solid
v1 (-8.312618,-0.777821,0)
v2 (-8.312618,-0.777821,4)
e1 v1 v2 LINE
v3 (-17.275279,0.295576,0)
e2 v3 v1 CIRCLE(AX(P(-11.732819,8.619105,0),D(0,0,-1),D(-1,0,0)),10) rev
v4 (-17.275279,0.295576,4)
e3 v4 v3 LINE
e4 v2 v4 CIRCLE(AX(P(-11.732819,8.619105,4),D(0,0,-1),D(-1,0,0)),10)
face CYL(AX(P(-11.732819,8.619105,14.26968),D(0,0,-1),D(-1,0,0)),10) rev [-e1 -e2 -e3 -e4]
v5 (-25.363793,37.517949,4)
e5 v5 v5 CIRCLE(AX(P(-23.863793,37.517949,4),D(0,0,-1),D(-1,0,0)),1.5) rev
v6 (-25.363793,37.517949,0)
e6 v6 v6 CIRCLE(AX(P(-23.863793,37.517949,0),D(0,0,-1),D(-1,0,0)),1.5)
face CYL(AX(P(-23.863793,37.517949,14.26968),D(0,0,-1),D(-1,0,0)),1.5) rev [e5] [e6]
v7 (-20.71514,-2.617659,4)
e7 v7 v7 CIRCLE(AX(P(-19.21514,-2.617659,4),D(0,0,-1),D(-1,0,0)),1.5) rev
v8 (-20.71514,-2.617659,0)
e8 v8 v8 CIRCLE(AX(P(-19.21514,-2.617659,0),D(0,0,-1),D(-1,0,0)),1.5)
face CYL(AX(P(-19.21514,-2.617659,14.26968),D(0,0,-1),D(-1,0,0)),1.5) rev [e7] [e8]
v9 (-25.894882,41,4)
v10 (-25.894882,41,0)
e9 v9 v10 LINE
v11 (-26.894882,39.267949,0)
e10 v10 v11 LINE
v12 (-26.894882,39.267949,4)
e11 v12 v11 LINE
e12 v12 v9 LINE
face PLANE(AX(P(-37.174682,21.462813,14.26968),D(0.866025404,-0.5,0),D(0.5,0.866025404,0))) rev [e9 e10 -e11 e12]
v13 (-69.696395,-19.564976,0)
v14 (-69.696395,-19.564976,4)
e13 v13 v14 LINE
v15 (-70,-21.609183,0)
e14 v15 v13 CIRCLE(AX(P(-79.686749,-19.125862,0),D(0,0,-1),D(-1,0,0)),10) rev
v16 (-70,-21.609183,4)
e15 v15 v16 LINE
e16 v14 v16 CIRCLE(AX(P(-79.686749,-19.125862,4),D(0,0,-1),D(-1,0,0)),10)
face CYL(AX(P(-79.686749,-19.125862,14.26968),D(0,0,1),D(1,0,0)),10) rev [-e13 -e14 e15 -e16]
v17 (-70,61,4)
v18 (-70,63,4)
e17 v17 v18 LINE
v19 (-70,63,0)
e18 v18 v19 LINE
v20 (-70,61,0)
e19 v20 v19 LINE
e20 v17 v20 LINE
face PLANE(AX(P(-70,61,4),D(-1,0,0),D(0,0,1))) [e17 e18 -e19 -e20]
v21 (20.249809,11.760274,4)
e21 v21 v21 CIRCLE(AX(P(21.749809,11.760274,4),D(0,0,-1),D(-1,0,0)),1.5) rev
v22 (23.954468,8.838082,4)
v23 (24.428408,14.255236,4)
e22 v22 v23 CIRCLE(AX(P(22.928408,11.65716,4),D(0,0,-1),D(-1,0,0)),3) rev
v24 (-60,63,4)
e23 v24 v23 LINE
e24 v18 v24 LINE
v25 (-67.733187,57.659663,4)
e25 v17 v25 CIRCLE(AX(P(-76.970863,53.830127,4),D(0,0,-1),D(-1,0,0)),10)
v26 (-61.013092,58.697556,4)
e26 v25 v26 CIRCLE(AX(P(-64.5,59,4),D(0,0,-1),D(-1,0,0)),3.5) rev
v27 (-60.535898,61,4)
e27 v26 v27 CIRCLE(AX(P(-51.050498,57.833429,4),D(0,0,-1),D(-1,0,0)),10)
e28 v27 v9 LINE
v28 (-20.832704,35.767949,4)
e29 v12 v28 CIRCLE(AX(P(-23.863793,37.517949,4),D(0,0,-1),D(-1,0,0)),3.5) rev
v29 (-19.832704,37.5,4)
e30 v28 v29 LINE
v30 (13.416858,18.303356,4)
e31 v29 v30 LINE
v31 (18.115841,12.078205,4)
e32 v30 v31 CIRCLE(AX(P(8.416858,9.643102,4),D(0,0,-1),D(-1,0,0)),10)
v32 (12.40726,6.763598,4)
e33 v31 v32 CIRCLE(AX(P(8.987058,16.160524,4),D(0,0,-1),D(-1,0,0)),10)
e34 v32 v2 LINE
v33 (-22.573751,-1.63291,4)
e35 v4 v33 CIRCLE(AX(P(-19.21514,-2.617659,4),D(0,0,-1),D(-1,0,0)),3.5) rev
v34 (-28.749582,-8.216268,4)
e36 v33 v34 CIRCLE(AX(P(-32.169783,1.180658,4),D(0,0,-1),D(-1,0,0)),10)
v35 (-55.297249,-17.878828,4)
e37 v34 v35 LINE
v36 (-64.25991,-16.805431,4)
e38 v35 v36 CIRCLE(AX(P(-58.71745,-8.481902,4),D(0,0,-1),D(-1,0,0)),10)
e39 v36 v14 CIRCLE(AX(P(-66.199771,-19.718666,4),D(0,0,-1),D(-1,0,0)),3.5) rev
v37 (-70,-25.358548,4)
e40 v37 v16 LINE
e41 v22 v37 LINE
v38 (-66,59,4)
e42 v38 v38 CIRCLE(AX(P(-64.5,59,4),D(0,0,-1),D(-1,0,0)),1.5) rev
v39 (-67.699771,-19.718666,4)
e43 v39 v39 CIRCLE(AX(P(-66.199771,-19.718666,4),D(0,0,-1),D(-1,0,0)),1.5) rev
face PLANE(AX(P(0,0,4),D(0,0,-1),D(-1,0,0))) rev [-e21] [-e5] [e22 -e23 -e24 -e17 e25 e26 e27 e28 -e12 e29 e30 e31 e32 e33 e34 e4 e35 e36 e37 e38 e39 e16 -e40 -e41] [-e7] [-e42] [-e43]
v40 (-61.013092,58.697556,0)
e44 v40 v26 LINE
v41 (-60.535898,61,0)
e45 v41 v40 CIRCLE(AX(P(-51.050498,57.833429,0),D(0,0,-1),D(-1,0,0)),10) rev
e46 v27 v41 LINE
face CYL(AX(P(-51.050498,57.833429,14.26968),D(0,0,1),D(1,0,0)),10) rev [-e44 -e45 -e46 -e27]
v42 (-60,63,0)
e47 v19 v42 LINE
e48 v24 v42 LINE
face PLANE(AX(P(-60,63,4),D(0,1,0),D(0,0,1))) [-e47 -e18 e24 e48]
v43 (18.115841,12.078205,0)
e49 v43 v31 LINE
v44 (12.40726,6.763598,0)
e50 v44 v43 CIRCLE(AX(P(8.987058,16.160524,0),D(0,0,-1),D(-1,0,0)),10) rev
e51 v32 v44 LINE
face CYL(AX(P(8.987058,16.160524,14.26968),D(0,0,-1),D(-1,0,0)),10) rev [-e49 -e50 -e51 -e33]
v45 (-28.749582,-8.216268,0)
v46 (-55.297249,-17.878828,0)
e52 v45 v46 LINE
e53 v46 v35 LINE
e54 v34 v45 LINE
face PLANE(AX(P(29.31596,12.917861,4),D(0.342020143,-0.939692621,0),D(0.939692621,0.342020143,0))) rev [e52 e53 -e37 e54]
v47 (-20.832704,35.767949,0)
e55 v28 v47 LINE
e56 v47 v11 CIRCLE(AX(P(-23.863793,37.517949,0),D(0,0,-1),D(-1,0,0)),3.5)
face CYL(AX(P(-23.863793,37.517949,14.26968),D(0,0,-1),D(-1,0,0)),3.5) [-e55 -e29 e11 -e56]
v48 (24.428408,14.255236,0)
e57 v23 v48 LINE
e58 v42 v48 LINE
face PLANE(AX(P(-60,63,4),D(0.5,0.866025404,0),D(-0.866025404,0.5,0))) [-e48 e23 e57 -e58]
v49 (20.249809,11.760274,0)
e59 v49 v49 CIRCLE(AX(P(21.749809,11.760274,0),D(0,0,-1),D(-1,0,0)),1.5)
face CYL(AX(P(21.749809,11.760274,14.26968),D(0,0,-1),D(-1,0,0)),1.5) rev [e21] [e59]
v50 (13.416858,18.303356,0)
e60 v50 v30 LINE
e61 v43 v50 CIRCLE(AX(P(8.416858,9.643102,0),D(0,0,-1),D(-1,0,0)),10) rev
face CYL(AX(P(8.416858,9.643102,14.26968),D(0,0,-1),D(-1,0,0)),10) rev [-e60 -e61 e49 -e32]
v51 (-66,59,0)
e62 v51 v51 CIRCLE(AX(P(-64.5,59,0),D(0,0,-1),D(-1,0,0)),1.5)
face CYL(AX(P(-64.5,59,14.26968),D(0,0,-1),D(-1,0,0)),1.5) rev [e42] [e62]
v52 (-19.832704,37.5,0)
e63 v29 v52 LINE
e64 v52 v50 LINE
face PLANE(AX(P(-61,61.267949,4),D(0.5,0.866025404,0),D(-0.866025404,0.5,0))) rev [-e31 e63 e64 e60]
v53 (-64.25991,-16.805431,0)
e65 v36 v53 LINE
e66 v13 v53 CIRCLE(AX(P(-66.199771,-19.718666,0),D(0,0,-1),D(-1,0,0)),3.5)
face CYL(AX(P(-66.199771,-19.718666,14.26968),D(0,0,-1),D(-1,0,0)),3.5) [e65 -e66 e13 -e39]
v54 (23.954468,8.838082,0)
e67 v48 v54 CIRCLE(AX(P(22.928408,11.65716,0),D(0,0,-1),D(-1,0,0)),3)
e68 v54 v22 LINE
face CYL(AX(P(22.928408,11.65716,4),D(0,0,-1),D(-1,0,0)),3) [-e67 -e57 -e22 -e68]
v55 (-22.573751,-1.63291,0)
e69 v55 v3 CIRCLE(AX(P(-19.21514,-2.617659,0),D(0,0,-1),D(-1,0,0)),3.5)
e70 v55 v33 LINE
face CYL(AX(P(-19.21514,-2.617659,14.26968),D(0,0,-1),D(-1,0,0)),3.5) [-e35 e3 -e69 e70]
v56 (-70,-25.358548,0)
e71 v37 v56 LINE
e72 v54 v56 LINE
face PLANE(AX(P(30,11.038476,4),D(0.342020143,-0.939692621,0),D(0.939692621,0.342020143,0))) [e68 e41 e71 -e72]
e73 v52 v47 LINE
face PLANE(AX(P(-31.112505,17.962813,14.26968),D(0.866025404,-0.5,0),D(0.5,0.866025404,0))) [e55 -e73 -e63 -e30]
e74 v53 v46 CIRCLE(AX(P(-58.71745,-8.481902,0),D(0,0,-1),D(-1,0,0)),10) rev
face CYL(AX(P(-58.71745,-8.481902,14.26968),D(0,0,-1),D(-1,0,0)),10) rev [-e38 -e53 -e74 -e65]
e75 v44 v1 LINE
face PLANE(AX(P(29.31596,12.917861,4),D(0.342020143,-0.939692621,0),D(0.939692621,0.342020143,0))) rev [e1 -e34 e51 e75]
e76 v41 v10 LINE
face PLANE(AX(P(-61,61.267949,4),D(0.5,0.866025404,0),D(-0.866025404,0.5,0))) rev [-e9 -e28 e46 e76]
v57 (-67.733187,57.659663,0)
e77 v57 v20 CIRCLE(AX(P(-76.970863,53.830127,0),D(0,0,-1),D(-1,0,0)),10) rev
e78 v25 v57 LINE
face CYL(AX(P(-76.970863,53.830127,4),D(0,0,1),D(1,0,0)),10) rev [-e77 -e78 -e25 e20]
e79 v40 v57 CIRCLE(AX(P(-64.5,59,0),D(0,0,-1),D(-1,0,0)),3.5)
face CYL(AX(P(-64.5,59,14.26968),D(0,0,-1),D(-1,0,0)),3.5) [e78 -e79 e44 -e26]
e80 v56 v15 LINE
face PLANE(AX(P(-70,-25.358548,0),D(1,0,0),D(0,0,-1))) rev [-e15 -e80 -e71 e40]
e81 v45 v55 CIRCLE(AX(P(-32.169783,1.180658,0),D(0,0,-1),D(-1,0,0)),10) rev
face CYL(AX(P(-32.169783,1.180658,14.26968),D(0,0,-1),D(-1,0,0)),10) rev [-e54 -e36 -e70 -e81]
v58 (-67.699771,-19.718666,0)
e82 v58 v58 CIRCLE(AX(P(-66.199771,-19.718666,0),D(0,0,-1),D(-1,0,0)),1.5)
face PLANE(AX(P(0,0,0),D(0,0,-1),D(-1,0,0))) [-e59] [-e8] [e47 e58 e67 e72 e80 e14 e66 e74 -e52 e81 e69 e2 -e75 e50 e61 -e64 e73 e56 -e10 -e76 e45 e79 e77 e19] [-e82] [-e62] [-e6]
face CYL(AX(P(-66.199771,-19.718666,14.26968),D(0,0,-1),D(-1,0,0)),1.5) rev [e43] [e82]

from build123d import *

# Parameters (mm, degrees)
EXTRUDE_THIN1_DEPTH = 4
SKETCH2_R           = 1.5
BOSS_EXTRUDE1_DEPTH = 4
FILLET1_DEPTH       = 4
FILLET1_2_DEPTH     = 4
SKETCH3_W           = 3.133113898
SKETCH3_H           = 7.459824135
CUT_EXTRUDE1_DEPTH  = 95.769370322


with BuildPart() as part:
    # Sketch1 → Extrude-Thin1 (new body)
    with BuildSketch(Plane.XY):
        Polygon((-70, -25.358547654), (30, 11.038475773), (-60, 63), (-70, 63), (-70, 61), (-60.535898385, 61), (25.285605056, 11.450931886), (-70.684040287, -23.479162412), align=None)
    extrude(amount=EXTRUDE_THIN1_DEPTH)

    # Sketch2 → Boss-Extrude1 (add)
    # profile 1 of 17: a face of its own
    with BuildSketch(Plane(origin=(0, 0, 0), x_dir=(-1, 0, 0), z_dir=(0, 0, -1))):
        with BuildLine():
            ThreePointArc((69.699771159, -19.718666382), (66.807539781, -16.271839247), (62.910846986, -18.521595881))
            ThreePointArc((62.910846986, -18.521595881), (62.703305352, -19.561418618), (62.816669308, -20.615673554))
            Line((62.816669308, -20.615673554), (68.214792437, -22.580429694))
            ThreePointArc((68.214792437, -22.580429694), (68.979296275, -21.845692505), (69.488695332, -20.915736884))
            ThreePointArc((69.488695332, -20.915736884), (69.646598295, -20.326435004), (69.699771159, -19.718666382))
        make_face()
        with Locations((66.199771159, -19.718666382)):
            Circle(SKETCH2_R, mode=Mode.SUBTRACT)
    # profile 2 of 17: a face of its own
    with BuildSketch(Plane(origin=(0, 0, 0), x_dir=(-1, 0, 0), z_dir=(0, 0, -1))):
        with BuildLine():
            ThreePointArc((69.488695332, -20.915736884), (68.979296275, -21.845692505), (68.214792437, -22.580429694))
            Line((68.214792437, -22.580429694), (68.804655045, -22.795122125))
            Line((68.804655045, -22.795122125), (69.488695332, -20.915736884))
        make_face()
    # profile 3 of 17: a face of its own
    with BuildSketch(Plane(origin=(0, 0, 0), x_dir=(-1, 0, 0), z_dir=(0, 0, -1))):
        with BuildLine():
            Line((62.910846986, -18.521595881), (62.2268067, -20.400981122))
            Line((62.2268067, -20.400981122), (62.816669308, -20.615673554))
            ThreePointArc((62.816669308, -20.615673554), (62.703305352, -19.561418618), (62.910846986, -18.521595881))
        make_face()
    # profile 4 of 17: a face of its own
    with BuildSketch(Plane(origin=(0, 0, 0), x_dir=(-1, 0, 0), z_dir=(0, 0, -1))):
        with BuildLine():
            ThreePointArc((22.71514012, -2.617659216), (19.822908742, 0.82916792), (15.926215947, -1.420588714))
            ThreePointArc((15.926215947, -1.420588714), (15.718674313, -2.460411452), (15.832038269, -3.514666388))
            Line((15.832038269, -3.514666388), (21.230161397, -5.479422527))
            ThreePointArc((21.230161397, -5.479422527), (21.994665236, -4.744685339), (22.504064292, -3.814729718))
            ThreePointArc((22.504064292, -3.814729718), (22.661967255, -3.225427838), (22.71514012, -2.617659216))
        make_face()
        with Locations((19.21514012, -2.617659216)):
            Circle(SKETCH2_R, mode=Mode.SUBTRACT)
    # profile 5 of 17: a face of its own
    with BuildSketch(Plane(origin=(0, 0, 0), x_dir=(-1, 0, 0), z_dir=(0, 0, -1))):
        with BuildLine():
            ThreePointArc((22.504064292, -3.814729718), (21.994665236, -4.744685339), (21.230161397, -5.479422527))
            Line((21.230161397, -5.479422527), (21.820024006, -5.694114959))
            Line((21.820024006, -5.694114959), (22.504064292, -3.814729718))
        make_face()
    # profile 6 of 17: a face of its own
    with BuildSketch(Plane(origin=(0, 0, 0), x_dir=(-1, 0, 0), z_dir=(0, 0, -1))):
        with BuildLine():
            Line((15.926215947, -1.420588714), (15.24217566, -3.299973956))
            Line((15.24217566, -3.299973956), (15.832038269, -3.514666388))
            ThreePointArc((15.832038269, -3.514666388), (15.718674313, -2.460411452), (15.926215947, -1.420588714))
        make_face()
    # profile 7 of 17: a face of its own
    with BuildSketch(Plane(origin=(0, 0, 0), x_dir=(-1, 0, 0), z_dir=(0, 0, -1))):
        with BuildLine():
            ThreePointArc((-18.249808849, 11.760273971), (-18.650603728, 13.386597315), (-19.761196061, 14.640450906))
            Line((-19.761196061, 14.640450906), (-22.499808851, 13.059312075))
            ThreePointArc((-22.499808851, 13.059312075), (-20.99980885, 13.059312077), (-20.249808849, 11.760273971))
            ThreePointArc((-20.249808849, 11.760273971), (-20.889444174, 10.531545919), (-22.262839017, 10.350735022))
            Line((-22.262839017, 10.350735022), (-19.291270082, 9.269172381))
            ThreePointArc((-19.291270082, 9.269172381), (-18.520653721, 10.410252801), (-18.249808849, 11.760273971))
        make_face()
    # profile 8 of 17: a face of its own
    with BuildSketch(Plane(origin=(0, 0, 0), x_dir=(-1, 0, 0), z_dir=(0, 0, -1))):
        with BuildLine():
            Line((-22.499808851, 13.059312075), (-25.238421636, 11.478173246))
            ThreePointArc((-25.238421636, 11.478173246), (-25.236490292, 11.455228871), (-25.234408046, 11.432297698))
            Line((-25.234408046, 11.432297698), (-22.262839017, 10.350735022))
            ThreePointArc((-22.262839017, 10.350735022), (-23.244100894, 11.62954033), (-22.499808851, 13.059312075))
        make_face()
    # profile 9 of 17: a face of its own
    with BuildSketch(Plane(origin=(0, 0, 0), x_dir=(-1, 0, 0), z_dir=(0, 0, -1))):
        with BuildLine():
            ThreePointArc((-18.249808849, 11.760273971), (-18.650603728, 13.386597315), (-19.761196061, 14.640450906))
            Line((-19.761196061, 14.640450906), (-22.499808851, 13.059312075))
            ThreePointArc((-22.499808851, 13.059312075), (-20.99980885, 13.059312077), (-20.249808849, 11.760273971))
            ThreePointArc((-20.249808849, 11.760273971), (-20.889444174, 10.531545919), (-22.262839017, 10.350735022))
            Line((-22.262839017, 10.350735022), (-19.291270082, 9.269172381))
            ThreePointArc((-19.291270082, 9.269172381), (-18.520653721, 10.410252801), (-18.249808849, 11.760273971))
        make_face()
    # profile 10 of 17: a face of its own
    with BuildSketch(Plane(origin=(0, 0, 0), x_dir=(-1, 0, 0), z_dir=(0, 0, -1))):
        with BuildLine():
            Line((-22.499808851, 13.059312075), (-25.238421636, 11.478173246))
            ThreePointArc((-25.238421636, 11.478173246), (-25.236490292, 11.455228871), (-25.234408046, 11.432297698))
            Line((-25.234408046, 11.432297698), (-22.262839017, 10.350735022))
            ThreePointArc((-22.262839017, 10.350735022), (-23.244100894, 11.62954033), (-22.499808851, 13.059312075))
        make_face()
    # profile 11 of 17: a face of its own
    with BuildSketch(Plane(origin=(0, 0, 0), x_dir=(-1, 0, 0), z_dir=(0, 0, -1))):
        with BuildLine():
            ThreePointArc((-25.234408046, 11.432297698), (-25.236490292, 11.455228871), (-25.238421636, 11.478173246))
            Line((-25.238421636, 11.478173246), (-25.285605056, 11.450931886))
            Line((-25.285605056, 11.450931886), (-25.234408046, 11.432297698))
        make_face()
    # profile 12 of 17: a face of its own
    with BuildSketch(Plane(origin=(0, 0, 0), x_dir=(-1, 0, 0), z_dir=(0, 0, -1))):
        with BuildLine():
            ThreePointArc((27.36379332, 37.517949192), (27.244533712, 38.42381585), (26.894882233, 39.267949192))
            ThreePointArc((26.894882233, 39.267949192), (26.231736995, 40.09532048), (25.351261913, 40.686140662))
            Line((25.351261913, 40.686140662), (20.376324727, 37.813859338))
            ThreePointArc((20.376324727, 37.813859338), (20.447752473, 36.75593546), (20.832704407, 35.767949192))
            ThreePointArc((20.832704407, 35.767949192), (24.769659978, 34.1372088), (27.36379332, 37.517949192))
        make_face()
        with Locations((23.86379332, 37.517949192)):
            Circle(SKETCH2_R, mode=Mode.SUBTRACT)
    # profile 13 of 17: a face of its own
    with BuildSketch(Plane(origin=(0, 0, 0), x_dir=(-1, 0, 0), z_dir=(0, 0, -1))):
        with BuildLine():
            Line((26.894882233, 39.267949192), (25.894882233, 41))
            Line((25.894882233, 41), (25.351261913, 40.686140662))
            ThreePointArc((25.351261913, 40.686140662), (26.231736995, 40.09532048), (26.894882233, 39.267949192))
        make_face()
    # profile 14 of 17: a face of its own
    with BuildSketch(Plane(origin=(0, 0, 0), x_dir=(-1, 0, 0), z_dir=(0, 0, -1))):
        with BuildLine():
            ThreePointArc((20.832704407, 35.767949192), (20.447752473, 36.75593546), (20.376324727, 37.813859338))
            Line((20.376324727, 37.813859338), (19.832704407, 37.5))
            Line((19.832704407, 37.5), (20.832704407, 35.767949192))
        make_face()
    # profile 15 of 17: a face of its own
    with BuildSketch(Plane(origin=(0, 0, 0), x_dir=(-1, 0, 0), z_dir=(0, 0, -1))):
        with BuildLine():
            ThreePointArc((61, 59), (64.5, 55.5), (68, 59))
            ThreePointArc((68, 59), (67.839385021, 60.048097173), (67.372281323, 61))
            Line((67.372281323, 61), (61.627718677, 61))
            ThreePointArc((61.627718677, 61), (61.160614979, 60.048097173), (61, 59))
        make_face()
        with Locations((64.5, 59)):
            Circle(SKETCH2_R, mode=Mode.SUBTRACT)
    # profile 16 of 17: a face of its own
    with BuildSketch(Plane(origin=(0, 0, 0), x_dir=(-1, 0, 0), z_dir=(0, 0, -1))):
        with BuildLine():
            Line((61, 61), (61, 59))
            ThreePointArc((61, 59), (61.160614979, 60.048097173), (61.627718677, 61))
            Line((61.627718677, 61), (61, 61))
        make_face()
    # profile 17 of 17: a face of its own
    with BuildSketch(Plane(origin=(0, 0, 0), x_dir=(-1, 0, 0), z_dir=(0, 0, -1))):
        with BuildLine():
            ThreePointArc((67.372281323, 61), (67.839385021, 60.048097173), (68, 59))
            Line((68, 59), (68, 61))
            Line((68, 61), (67.372281323, 61))
        make_face()
    extrude(amount=-BOSS_EXTRUDE1_DEPTH)

    # Fillet1: read off the stored shape, not the designer's step
    # Fillet1 outline → Fillet1 (cut)
    with BuildSketch(Plane.XY):
        with BuildLine():
            Line((30, 11.038475773), (24.428407585, 14.255236154))
            ThreePointArc((24.428407585, 14.255236154), (25.916991679, 11.395692714), (23.954468015, 8.83808208))
            Line((23.954468015, 8.83808208), (30, 11.038475773))
        make_face()
    extrude(amount=FILLET1_DEPTH, mode=Mode.SUBTRACT)

    # Fillet1 2 outline → Fillet1 2 (add)
    with BuildSketch(Plane.XY):
        with BuildLine():
            ThreePointArc((13.416857787, 18.303356317), (16.398283352, 15.667788657), (18.115840977, 12.078204963))
            ThreePointArc((18.115840977, 12.078204963), (15.801052244, 8.841405863), (12.407259711, 6.763597514))
            Line((12.407259711, 6.763597514), (19.291270082, 9.269172381))
            ThreePointArc((19.291270082, 9.269172381), (18.263127406, 12.06531907), (19.761196061, 14.640450906))
            Line((19.761196061, 14.640450906), (13.416857787, 18.303356317))
        make_face()
        with BuildLine():
            ThreePointArc((-69.488695332, -20.915736884), (-69.65911424, -20.25059255), (-69.696395151, -19.564976241))
            ThreePointArc((-69.696395151, -19.564976241), (-69.990650839, -21.572424943), (-70.684040287, -23.479162412))
            Line((-70.684040287, -23.479162412), (-68.804655045, -22.795122125))
            Line((-68.804655045, -22.795122125), (-69.488695332, -20.915736884))
        make_face()
        with BuildLine():
            Line((-62.2268067, -20.400981122), (-55.29724871, -17.878828277))
            ThreePointArc((-55.29724871, -17.878828277), (-59.906584574, -18.410948313), (-64.259910155, -16.80543119))
            ThreePointArc((-64.259910155, -16.80543119), (-63.448161827, -17.555648564), (-62.910846986, -18.521595881))
            Line((-62.910846986, -18.521595881), (-62.2268067, -20.400981122))
        make_face()
        with BuildLine():
            ThreePointArc((-22.504064292, -3.814729718), (-22.713356211, -2.729391821), (-22.573751348, -1.632910203))
            ThreePointArc((-22.573751348, -1.632910203), (-24.876585704, -5.661071418), (-28.749581995, -8.216267804))
            Line((-28.749581995, -8.216267804), (-21.820024006, -5.694114959))
            Line((-21.820024006, -5.694114959), (-22.504064292, -3.814729718))
        make_face()
        with BuildLine():
            Line((-15.24217566, -3.299973956), (-8.312617671, -0.777821111))
            ThreePointArc((-8.312617671, -0.777821111), (-12.921953535, -1.309941147), (-17.275279116, 0.295575976))
            ThreePointArc((-17.275279116, 0.295575976), (-16.463530787, -0.454641397), (-15.926215947, -1.420588714))
            Line((-15.926215947, -1.420588714), (-15.24217566, -3.299973956))
        make_face()
        with BuildLine():
            ThreePointArc((-70, 61), (-68.69628443, 59.445406029), (-67.733186639, 57.65966267))
            ThreePointArc((-67.733186639, 57.65966267), (-67.93264863, 58.316682078), (-68, 59))
            Line((-68, 59), (-68, 61))
            Line((-68, 61), (-70, 61))
        make_face()
        with BuildLine():
            ThreePointArc((-61.013092006, 58.697555558), (-60.842404557, 59.862852348), (-60.535898385, 61))
            Line((-60.535898385, 61), (-61, 61))
            Line((-61, 61), (-61, 59))
            ThreePointArc((-61, 59), (-61.003274533, 58.848636166), (-61.013092006, 58.697555558))
        make_face()
    extrude(amount=FILLET1_2_DEPTH)

    # Sketch3 → Cut-Extrude1 (cut, through all)
    with BuildSketch(Plane.XY.offset(4)):
        with Locations((-71.566556949, -21.628635587)):
            Rectangle(SKETCH3_W, SKETCH3_H)
    extrude(amount=-CUT_EXTRUDE1_DEPTH, mode=Mode.SUBTRACT)


solid = part.part
